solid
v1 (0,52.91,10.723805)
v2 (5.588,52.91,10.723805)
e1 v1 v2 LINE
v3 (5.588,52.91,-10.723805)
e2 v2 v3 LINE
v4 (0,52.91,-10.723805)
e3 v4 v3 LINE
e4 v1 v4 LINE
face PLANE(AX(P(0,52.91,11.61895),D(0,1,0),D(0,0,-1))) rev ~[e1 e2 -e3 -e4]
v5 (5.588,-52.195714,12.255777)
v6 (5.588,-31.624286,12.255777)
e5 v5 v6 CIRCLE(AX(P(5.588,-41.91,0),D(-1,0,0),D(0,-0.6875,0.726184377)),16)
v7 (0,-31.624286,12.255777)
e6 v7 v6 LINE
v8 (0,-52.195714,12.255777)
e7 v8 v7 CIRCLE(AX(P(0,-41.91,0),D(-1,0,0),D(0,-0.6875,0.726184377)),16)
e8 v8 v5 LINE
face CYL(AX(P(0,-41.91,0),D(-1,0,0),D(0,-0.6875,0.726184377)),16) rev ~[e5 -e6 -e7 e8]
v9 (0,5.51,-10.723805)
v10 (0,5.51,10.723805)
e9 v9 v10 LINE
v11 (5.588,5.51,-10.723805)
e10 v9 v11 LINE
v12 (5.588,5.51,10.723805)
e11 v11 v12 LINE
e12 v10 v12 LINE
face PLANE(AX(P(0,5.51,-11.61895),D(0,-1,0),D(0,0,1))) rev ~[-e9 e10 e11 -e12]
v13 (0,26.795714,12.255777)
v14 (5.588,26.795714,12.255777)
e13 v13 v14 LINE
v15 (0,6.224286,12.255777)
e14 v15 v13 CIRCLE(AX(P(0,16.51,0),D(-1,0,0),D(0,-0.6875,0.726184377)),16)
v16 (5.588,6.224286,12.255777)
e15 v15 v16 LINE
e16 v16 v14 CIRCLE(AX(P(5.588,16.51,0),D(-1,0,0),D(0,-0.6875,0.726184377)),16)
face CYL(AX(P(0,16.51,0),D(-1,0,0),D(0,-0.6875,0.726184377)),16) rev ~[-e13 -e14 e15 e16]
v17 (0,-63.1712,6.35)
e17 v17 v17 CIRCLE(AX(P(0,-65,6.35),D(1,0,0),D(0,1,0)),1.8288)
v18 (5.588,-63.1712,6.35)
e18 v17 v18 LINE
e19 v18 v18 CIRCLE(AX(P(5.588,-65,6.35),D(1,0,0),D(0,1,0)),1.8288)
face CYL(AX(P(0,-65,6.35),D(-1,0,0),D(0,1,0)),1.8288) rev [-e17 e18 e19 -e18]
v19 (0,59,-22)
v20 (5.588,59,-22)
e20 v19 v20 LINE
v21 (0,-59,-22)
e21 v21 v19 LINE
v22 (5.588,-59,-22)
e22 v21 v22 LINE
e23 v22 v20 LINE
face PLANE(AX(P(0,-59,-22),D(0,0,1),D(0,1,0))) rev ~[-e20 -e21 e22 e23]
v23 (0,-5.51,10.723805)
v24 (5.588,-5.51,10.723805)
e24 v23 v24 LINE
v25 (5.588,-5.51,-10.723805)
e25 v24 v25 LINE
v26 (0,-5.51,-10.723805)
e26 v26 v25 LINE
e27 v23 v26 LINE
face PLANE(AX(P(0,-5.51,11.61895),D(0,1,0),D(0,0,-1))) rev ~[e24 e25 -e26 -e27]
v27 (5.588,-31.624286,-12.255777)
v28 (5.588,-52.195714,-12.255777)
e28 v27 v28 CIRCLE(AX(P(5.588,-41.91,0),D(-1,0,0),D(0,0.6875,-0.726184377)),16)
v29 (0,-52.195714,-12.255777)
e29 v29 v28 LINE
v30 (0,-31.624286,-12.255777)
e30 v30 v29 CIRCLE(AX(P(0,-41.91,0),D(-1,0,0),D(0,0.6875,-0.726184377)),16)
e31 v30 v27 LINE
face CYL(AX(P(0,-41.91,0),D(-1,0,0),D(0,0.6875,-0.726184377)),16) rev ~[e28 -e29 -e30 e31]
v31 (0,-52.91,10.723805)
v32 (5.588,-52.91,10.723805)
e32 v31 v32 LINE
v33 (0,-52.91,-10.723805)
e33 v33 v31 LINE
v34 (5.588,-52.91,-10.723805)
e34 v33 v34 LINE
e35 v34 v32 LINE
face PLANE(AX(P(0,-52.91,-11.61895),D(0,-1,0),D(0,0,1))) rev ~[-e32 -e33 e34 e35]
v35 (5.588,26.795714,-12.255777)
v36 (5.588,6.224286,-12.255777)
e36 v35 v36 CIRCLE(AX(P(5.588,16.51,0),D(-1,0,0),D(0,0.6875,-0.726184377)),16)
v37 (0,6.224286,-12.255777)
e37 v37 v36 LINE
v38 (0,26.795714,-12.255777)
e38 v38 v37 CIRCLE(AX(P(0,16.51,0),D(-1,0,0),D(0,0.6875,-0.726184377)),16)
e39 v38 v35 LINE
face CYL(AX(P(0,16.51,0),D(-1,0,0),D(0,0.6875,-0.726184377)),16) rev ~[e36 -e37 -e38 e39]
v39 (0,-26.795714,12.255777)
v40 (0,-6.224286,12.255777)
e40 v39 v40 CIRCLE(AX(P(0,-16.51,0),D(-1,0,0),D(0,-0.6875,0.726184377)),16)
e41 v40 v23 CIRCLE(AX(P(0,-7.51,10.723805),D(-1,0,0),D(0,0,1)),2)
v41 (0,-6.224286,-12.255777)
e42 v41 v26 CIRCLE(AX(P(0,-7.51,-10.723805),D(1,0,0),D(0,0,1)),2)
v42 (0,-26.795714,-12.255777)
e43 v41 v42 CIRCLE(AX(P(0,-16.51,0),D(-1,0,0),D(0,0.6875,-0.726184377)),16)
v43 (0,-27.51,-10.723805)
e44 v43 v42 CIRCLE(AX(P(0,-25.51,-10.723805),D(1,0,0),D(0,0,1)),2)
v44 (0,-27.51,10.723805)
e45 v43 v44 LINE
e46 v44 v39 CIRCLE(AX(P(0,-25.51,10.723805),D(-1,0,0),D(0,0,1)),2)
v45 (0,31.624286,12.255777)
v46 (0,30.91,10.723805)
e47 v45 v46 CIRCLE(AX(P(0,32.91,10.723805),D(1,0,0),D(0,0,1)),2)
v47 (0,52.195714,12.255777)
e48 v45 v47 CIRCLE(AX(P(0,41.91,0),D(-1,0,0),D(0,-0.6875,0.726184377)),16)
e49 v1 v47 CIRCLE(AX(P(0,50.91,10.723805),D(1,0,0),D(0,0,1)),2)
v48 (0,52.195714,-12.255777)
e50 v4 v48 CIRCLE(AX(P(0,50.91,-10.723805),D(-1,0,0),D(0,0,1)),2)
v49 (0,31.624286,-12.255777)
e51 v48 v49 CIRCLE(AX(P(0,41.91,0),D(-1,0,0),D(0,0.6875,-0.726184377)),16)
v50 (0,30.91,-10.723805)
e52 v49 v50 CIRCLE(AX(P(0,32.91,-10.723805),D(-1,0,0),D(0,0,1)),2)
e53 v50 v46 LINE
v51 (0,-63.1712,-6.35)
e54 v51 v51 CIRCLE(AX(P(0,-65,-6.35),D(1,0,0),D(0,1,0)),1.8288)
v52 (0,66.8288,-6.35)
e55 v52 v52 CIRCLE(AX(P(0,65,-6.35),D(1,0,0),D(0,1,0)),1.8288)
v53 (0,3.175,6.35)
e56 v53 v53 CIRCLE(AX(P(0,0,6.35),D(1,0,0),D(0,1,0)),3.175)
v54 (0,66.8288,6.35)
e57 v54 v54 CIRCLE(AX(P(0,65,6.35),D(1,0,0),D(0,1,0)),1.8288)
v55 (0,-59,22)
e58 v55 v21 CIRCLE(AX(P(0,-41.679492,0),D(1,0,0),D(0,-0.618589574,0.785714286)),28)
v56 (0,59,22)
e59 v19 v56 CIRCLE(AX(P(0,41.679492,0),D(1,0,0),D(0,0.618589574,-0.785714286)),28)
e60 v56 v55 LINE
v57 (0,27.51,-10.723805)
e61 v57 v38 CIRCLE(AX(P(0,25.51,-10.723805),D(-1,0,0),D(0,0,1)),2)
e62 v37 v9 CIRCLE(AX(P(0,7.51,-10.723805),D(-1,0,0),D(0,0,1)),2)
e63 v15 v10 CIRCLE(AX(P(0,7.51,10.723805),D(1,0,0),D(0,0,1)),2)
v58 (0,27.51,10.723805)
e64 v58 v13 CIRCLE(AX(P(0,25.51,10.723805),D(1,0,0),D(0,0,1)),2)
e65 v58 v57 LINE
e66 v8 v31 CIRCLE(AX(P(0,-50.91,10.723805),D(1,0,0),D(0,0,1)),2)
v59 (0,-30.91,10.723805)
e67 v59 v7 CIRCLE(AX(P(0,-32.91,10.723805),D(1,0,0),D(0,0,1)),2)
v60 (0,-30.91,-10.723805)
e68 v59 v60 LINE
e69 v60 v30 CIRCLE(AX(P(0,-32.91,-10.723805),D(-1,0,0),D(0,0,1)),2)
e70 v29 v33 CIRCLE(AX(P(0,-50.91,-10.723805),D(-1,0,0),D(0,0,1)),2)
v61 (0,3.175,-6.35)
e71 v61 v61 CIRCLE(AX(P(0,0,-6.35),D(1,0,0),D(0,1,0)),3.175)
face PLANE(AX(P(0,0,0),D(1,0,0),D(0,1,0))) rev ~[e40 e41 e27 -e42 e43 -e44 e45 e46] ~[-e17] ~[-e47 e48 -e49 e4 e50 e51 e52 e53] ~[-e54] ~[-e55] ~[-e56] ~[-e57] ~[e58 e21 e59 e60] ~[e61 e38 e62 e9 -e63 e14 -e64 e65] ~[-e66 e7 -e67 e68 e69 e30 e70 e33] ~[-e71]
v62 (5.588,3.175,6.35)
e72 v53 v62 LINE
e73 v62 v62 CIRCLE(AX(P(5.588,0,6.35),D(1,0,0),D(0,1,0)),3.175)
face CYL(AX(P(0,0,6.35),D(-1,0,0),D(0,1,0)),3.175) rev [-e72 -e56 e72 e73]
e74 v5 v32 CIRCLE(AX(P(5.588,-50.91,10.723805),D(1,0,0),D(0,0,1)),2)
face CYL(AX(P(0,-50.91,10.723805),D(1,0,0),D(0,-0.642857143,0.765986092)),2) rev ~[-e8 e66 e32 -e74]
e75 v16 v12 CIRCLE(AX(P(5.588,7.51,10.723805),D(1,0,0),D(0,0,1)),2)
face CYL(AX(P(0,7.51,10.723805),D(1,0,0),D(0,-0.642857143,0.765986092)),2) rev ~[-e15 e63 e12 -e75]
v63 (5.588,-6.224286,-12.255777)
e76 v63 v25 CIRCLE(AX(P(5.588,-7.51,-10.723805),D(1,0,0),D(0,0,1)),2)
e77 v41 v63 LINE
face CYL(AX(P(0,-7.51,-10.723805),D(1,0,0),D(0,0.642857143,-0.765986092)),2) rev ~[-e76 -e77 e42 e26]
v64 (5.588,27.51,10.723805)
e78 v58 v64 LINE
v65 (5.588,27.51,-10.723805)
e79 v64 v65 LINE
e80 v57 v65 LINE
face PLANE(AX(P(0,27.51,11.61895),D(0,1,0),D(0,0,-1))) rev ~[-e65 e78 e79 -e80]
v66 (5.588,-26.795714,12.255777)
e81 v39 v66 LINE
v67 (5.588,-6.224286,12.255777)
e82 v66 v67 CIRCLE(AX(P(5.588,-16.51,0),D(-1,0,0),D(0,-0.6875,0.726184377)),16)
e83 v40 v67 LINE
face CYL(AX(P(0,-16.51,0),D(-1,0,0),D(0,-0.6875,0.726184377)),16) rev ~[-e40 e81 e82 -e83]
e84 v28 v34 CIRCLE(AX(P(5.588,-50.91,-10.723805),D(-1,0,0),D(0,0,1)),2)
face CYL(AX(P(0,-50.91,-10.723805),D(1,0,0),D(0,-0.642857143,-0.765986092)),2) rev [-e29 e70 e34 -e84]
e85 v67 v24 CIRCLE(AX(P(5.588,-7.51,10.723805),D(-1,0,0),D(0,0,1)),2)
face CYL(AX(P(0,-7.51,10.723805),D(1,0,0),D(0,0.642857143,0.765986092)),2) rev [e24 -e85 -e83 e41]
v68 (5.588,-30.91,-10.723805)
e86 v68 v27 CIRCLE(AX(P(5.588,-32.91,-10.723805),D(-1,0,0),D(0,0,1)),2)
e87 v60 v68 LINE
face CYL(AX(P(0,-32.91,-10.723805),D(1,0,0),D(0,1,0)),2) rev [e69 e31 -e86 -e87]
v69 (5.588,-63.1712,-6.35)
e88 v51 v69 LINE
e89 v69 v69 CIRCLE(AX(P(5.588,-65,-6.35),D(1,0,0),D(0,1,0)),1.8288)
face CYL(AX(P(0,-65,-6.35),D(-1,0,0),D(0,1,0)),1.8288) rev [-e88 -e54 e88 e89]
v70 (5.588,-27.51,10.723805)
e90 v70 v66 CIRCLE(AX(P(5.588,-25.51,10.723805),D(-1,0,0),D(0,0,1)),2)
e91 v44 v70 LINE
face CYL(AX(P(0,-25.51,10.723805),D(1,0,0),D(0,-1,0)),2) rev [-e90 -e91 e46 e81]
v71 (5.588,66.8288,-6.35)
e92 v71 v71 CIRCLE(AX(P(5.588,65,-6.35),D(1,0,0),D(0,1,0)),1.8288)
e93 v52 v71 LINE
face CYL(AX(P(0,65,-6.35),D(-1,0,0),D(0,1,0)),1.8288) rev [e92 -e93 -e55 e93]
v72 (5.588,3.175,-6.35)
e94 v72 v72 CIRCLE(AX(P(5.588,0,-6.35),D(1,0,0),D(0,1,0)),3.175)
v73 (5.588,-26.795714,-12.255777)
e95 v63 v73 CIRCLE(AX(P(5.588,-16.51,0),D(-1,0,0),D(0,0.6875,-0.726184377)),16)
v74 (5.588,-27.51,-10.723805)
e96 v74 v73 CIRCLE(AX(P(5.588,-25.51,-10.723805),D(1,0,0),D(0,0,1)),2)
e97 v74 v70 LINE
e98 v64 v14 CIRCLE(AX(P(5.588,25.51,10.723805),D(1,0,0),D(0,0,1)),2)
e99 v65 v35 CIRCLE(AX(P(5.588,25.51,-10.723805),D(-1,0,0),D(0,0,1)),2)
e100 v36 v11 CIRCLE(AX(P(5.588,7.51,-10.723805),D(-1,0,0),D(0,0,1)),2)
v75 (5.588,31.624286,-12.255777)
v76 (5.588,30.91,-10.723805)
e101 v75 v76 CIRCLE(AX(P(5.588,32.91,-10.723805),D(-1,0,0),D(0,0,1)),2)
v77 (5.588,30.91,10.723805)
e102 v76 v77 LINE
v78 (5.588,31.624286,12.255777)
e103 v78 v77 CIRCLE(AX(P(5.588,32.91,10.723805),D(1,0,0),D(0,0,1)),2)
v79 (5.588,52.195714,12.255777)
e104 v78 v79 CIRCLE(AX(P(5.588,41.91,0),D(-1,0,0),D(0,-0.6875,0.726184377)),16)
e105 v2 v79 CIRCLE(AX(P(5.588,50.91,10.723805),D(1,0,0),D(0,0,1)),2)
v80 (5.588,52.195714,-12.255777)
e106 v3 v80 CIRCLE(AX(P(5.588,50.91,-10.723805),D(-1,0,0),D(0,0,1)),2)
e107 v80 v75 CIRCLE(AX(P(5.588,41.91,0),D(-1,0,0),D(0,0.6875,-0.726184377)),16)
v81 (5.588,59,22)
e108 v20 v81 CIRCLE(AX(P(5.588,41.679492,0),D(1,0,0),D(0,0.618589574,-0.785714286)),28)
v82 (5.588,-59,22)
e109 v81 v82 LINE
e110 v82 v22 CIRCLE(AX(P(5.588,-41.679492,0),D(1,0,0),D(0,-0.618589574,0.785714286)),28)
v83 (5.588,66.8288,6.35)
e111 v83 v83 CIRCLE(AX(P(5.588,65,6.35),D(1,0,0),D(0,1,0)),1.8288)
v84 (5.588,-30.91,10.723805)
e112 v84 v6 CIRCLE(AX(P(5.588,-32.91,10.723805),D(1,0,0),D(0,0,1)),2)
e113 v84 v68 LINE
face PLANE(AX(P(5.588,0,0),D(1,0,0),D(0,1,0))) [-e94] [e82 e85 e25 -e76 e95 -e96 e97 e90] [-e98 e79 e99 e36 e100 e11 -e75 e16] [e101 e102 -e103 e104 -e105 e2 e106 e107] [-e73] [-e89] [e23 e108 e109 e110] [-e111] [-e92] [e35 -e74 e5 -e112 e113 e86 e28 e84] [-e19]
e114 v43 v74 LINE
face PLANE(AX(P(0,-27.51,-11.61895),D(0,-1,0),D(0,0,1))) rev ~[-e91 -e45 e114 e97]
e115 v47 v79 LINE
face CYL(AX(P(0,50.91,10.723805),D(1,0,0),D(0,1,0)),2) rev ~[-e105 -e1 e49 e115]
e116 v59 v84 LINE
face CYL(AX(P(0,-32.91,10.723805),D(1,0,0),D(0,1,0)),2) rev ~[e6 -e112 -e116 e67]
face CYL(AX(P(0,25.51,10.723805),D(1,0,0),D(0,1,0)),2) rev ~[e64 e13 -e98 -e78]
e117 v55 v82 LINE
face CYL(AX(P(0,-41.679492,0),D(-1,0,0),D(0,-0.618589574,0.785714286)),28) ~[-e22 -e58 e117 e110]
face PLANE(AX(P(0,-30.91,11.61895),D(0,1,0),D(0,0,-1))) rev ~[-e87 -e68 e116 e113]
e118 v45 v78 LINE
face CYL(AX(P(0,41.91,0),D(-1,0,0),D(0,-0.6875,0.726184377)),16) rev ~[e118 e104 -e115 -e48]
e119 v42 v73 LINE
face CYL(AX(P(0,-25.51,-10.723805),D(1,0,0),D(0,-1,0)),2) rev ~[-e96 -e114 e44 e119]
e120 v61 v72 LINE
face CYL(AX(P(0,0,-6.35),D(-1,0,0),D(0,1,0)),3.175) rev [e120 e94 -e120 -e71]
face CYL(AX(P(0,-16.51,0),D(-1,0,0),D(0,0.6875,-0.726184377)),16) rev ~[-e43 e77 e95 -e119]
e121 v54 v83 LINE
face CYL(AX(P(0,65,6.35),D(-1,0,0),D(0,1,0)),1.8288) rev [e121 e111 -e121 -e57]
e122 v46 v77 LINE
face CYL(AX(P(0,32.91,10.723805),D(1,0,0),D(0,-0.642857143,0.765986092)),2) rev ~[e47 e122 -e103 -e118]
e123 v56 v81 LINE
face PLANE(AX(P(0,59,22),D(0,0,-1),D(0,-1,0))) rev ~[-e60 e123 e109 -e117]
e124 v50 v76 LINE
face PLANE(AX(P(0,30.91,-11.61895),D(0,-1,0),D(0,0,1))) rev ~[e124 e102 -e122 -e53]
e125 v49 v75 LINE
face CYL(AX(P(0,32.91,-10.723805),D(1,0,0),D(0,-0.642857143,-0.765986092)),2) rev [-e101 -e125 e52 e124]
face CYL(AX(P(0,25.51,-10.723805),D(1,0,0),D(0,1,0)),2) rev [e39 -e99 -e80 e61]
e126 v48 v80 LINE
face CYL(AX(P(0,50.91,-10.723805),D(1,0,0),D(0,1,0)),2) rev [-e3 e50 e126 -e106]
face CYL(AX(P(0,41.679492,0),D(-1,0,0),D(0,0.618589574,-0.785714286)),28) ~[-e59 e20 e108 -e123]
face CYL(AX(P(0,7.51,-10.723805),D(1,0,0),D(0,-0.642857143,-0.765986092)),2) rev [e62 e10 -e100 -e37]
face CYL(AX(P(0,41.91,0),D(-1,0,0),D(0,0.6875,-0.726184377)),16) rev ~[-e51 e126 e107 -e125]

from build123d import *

# Parameters (mm, degrees)
F0_R     = 1.8288
F0_R_2   = 3.175
F1_DEPTH = 5.588
F2_R     = 2


# Not quite as in the source:
# - a feature names something its author has since deleted; it is built from what else it names


with BuildPart() as f1:
    # F0 (on Right) → F1 (new body)
    with BuildSketch(Plane.YZ):
        with BuildLine():
            ThreePointArc((59, -22), (69.6794919243, 0), (59, 22))
            Line((59, 22), (-59, 22))
            ThreePointArc((-59, 22), (-69.6794919243, 0), (-59, -22))
            Line((-59, -22), (59, -22))
        make_face()
        with Locations((-65, -6.35)):
            Circle(F0_R, mode=Mode.SUBTRACT)
        with Locations((0, -6.35)):
            Circle(F0_R_2, mode=Mode.SUBTRACT)
        with Locations((65, -6.35)):
            Circle(F0_R, mode=Mode.SUBTRACT)
        with BuildLine():
            ThreePointArc((-30.91, -11.6189500386), (-41.91, -16), (-52.91, -11.6189500386))
            Line((-52.91, -11.6189500386), (-52.91, 11.6189500386))
            ThreePointArc((-52.91, 11.6189500386), (-41.91, 16), (-30.91, 11.6189500386))
            Line((-30.91, 11.6189500386), (-30.91, -11.6189500386))
        make_face(mode=Mode.SUBTRACT)
        with Locations((-65, 6.35)):
            Circle(F0_R, mode=Mode.SUBTRACT)
        with BuildLine():
            ThreePointArc((-27.51, 11.6189500386), (-16.51, 16), (-5.51, 11.6189500386))
            Line((-5.51, 11.6189500386), (-5.51, -11.6189500386))
            ThreePointArc((-5.51, -11.6189500386), (-16.51, -16), (-27.51, -11.6189500386))
            Line((-27.51, -11.6189500386), (-27.51, 11.6189500386))
        make_face(mode=Mode.SUBTRACT)
        with BuildLine():
            ThreePointArc((27.51, -11.6189500386), (16.51, -16), (5.51, -11.6189500386))
            Line((5.51, -11.6189500386), (5.51, 11.6189500386))
            ThreePointArc((5.51, 11.6189500386), (16.51, 16), (27.51, 11.6189500386))
            Line((27.51, 11.6189500386), (27.51, -11.6189500386))
        make_face(mode=Mode.SUBTRACT)
        with Locations((0, 6.35)):
            Circle(F0_R_2, mode=Mode.SUBTRACT)
        with BuildLine():
            ThreePointArc((52.91, -11.6189500386), (41.91, -16), (30.91, -11.6189500386))
            Line((30.91, -11.6189500386), (30.91, 11.6189500386))
            ThreePointArc((30.91, 11.6189500386), (41.91, 16), (52.91, 11.6189500386))
            Line((52.91, 11.6189500386), (52.91, -11.6189500386))
        make_face(mode=Mode.SUBTRACT)
        with Locations((65, 6.35)):
            Circle(F0_R, mode=Mode.SUBTRACT)
    extrude(amount=F1_DEPTH)

    # F2
    f2_edges = [f1.edges().sort_by_distance(p)[0] for p in [
        (2.794, -5.51, 11.61895),
        (2.794, 52.91, 11.61895),
        (2.794, 5.51, -11.61895),
        (2.794, 5.51, 11.61895),
        (2.794, -52.91, -11.61895),
        (2.794, -52.91, 11.61895),
        (2.794, -5.51, -11.61895),
        (2.794, 52.91, -11.61895),
        (2.794, -30.91, -11.61895),
        (2.794, -30.91, 11.61895),
        (2.794, -27.51, -11.61895),
        (2.794, -27.51, 11.61895),
        (2.794, 27.51, 11.61895),
        (2.794, 27.51, -11.61895),
        (2.794, 30.91, 11.61895),
        (2.794, 30.91, -11.61895),
    ]]
    fillet(f2_edges, radius=F2_R)


solid = f1.part
